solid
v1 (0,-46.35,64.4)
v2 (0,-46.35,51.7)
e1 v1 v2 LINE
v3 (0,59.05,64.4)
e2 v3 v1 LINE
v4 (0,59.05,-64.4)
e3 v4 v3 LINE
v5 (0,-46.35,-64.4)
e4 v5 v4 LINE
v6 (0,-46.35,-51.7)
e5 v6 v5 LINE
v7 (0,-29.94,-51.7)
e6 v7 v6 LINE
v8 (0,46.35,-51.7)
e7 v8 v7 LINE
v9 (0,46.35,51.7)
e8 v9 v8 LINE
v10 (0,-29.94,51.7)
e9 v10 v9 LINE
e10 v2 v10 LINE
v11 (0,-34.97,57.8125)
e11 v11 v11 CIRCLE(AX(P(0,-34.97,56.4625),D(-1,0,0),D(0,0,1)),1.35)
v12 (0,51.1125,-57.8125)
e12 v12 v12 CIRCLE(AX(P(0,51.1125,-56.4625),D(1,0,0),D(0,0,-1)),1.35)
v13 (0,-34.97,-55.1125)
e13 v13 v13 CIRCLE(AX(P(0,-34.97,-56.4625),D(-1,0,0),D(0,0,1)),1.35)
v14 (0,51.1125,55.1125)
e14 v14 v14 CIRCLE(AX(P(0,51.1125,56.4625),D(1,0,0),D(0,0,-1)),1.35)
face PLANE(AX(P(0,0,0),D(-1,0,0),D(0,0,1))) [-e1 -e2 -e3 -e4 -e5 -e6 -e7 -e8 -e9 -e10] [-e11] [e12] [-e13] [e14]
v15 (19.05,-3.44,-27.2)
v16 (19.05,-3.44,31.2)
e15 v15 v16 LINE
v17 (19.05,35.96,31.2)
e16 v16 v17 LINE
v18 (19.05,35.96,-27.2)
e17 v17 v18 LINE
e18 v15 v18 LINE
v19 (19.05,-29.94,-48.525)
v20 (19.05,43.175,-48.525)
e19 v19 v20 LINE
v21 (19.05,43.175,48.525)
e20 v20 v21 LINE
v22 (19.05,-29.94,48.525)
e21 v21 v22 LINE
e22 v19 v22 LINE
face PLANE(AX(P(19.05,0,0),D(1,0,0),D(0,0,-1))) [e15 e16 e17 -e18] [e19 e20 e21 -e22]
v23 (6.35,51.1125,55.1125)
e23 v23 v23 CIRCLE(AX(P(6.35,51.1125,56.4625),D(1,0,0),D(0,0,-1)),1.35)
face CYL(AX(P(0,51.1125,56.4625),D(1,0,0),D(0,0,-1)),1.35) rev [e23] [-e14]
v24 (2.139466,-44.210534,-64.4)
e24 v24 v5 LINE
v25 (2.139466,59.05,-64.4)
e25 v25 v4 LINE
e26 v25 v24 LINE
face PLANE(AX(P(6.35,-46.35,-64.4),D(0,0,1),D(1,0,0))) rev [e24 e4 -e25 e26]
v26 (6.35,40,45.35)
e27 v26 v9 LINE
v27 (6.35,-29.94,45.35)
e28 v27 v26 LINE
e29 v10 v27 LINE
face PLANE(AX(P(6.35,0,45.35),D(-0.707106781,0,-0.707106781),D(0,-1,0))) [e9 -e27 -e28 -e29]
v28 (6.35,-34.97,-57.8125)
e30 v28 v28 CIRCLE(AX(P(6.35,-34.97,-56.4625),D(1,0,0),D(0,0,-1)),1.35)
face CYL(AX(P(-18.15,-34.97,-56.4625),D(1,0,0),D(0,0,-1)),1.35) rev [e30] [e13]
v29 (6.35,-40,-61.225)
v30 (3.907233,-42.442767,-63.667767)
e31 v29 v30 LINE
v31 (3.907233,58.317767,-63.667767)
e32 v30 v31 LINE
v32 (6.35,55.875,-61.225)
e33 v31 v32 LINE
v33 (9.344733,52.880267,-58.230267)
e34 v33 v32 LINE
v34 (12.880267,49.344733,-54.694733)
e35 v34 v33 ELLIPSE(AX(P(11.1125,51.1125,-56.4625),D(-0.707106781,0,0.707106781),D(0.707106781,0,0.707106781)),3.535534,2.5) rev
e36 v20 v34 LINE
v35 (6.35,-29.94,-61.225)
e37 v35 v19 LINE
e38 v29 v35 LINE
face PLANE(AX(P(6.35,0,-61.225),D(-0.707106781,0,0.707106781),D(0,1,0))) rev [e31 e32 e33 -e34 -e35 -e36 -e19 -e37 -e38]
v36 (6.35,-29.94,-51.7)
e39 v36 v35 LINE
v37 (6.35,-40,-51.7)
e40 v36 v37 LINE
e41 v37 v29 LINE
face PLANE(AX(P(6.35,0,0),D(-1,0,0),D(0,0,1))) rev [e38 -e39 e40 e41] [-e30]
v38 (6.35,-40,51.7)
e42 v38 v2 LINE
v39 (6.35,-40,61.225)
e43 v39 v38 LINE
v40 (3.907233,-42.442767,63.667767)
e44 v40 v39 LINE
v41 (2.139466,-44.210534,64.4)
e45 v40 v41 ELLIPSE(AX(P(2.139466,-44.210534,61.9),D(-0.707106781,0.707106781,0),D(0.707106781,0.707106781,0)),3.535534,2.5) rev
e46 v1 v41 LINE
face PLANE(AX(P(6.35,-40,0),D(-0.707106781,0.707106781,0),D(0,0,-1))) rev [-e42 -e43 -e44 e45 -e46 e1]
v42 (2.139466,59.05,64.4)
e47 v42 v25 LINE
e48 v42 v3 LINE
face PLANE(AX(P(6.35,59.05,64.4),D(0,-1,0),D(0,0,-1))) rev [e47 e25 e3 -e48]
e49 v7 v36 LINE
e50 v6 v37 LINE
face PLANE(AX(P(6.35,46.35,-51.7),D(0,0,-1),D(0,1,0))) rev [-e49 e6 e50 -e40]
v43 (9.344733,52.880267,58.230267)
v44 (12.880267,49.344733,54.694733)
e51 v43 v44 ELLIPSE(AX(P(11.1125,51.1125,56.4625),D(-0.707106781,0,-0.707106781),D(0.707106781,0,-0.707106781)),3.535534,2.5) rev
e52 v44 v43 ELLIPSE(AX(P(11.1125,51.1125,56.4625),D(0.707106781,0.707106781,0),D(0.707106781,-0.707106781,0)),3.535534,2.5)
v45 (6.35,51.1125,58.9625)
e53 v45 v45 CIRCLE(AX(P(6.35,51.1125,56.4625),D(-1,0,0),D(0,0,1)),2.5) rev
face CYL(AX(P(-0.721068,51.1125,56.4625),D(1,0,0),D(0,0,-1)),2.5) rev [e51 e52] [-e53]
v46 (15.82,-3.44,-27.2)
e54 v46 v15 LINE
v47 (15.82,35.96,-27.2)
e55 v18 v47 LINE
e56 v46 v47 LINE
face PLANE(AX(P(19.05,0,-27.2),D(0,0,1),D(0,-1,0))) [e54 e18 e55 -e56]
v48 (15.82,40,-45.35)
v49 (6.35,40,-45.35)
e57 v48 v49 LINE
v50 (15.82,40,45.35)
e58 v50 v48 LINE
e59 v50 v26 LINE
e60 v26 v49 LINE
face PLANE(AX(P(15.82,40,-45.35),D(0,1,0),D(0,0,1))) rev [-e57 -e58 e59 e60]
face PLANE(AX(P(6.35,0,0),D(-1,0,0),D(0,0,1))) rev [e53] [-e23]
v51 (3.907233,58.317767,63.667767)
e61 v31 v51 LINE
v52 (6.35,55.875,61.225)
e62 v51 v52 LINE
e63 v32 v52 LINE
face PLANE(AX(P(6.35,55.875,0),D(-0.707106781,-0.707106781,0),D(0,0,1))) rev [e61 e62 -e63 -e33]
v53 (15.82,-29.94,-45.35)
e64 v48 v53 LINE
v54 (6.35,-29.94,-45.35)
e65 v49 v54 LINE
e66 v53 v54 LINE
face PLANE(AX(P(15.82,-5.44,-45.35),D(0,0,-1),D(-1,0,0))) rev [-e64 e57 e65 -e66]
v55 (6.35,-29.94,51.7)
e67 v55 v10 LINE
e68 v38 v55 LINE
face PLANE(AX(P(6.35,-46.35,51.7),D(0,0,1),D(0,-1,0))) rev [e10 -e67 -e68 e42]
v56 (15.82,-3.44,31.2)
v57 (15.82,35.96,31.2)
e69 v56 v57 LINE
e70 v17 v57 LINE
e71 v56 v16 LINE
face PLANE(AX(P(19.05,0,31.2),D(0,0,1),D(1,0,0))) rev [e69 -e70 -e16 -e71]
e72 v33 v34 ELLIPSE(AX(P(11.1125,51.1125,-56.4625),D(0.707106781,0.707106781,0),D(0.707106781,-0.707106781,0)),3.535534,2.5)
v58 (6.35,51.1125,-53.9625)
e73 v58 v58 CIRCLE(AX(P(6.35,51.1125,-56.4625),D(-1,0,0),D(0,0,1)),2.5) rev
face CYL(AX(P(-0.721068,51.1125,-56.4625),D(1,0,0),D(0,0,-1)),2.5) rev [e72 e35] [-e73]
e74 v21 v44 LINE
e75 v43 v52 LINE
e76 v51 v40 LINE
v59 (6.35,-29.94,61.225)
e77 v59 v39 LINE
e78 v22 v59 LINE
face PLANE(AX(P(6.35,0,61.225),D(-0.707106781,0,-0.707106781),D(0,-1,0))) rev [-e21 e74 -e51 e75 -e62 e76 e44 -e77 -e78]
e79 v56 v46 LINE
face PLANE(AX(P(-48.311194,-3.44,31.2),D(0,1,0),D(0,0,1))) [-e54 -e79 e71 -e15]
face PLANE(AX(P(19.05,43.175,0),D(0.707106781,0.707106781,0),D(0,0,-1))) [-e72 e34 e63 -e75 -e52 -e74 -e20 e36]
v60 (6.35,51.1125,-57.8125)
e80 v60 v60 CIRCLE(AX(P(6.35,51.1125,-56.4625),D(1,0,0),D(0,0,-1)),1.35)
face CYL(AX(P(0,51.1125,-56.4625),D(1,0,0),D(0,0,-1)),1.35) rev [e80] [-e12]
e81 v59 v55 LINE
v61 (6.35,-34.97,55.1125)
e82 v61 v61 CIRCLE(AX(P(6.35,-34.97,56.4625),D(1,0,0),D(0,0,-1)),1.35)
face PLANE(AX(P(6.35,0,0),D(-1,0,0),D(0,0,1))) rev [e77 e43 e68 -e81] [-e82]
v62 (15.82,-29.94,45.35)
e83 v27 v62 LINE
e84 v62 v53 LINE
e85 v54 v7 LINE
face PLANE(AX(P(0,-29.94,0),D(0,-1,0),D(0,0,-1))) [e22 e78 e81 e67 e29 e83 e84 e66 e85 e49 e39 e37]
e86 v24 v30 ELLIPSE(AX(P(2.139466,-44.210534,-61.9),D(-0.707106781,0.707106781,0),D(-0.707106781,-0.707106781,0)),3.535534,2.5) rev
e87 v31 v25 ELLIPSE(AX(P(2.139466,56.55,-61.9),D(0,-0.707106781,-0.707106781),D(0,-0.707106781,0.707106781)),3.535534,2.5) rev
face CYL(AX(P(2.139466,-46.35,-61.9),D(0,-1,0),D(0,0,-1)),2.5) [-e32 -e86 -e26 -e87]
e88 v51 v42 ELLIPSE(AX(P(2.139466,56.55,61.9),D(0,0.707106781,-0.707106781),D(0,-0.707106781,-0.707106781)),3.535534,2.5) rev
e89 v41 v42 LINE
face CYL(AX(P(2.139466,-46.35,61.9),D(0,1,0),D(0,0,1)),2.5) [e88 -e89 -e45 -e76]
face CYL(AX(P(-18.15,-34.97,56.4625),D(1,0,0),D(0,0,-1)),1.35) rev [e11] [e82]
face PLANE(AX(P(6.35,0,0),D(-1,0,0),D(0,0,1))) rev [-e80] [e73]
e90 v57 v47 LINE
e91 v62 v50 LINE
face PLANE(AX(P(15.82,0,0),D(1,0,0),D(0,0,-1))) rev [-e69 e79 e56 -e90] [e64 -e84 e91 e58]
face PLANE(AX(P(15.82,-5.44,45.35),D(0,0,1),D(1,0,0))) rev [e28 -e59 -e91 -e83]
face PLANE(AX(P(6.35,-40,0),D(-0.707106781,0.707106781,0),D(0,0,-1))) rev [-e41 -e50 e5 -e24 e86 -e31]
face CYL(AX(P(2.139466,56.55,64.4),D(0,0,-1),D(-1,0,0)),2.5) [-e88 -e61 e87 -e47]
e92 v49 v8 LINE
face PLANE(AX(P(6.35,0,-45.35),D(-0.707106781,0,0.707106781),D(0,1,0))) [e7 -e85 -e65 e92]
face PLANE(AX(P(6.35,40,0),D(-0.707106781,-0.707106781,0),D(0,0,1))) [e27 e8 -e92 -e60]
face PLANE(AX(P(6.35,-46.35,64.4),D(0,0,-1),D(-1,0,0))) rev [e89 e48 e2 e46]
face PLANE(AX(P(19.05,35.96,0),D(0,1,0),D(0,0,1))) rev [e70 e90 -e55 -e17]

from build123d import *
from build123d.topology import SkipClean

# Parameters (mm, degrees)
BOSS_EXTRUDE1_DEPTH = 6.35
CHAMFER1_SIZE       = 3.175
BOSS_EXTRUDE2_DEPTH = 12.7
CHAMFER2_SIZE       = 12.7
CHAMFER3_SIZE       = 6.35
SKETCH3_W           = 90.7
SKETCH3_H           = 45.44
CUT_EXTRUDE1_DEPTH  = 9.47
BOSS_EXTRUDE3_DEPTH = 24.5
CHAMFER4_SIZE       = 6.35
SKETCH5_R           = 1.35
CUT_EXTRUDE2_DEPTH  = 24.5
FILLET1_R           = 2.5
SKETCH6_W           = 58.4
SKETCH6_H           = 26.5
BOSS_EXTRUDE4_DEPTH = 3.23
SKETCH7_R           = 2.5
CUT_EXTRUDE4_DEPTH  = 12.7
SKETCH8_R           = 1.35
CUT_EXTRUDE5_DEPTH  = 89.292426062


with BuildPart() as part:
    # Sketch1 → Boss-Extrude1 (new body)
    with BuildSketch(Plane(origin=(0, 0, 0), x_dir=(0, 0, -1), z_dir=(1, 0, 0))):
        Polygon((-64.4, -46.35), (-64.4, 59.05), (64.4, 59.05), (64.4, -46.35), (51.7, -46.35), (51.7, 46.35), (-51.7, 46.35), (-51.7, -46.35), align=None)
    extrude(amount=BOSS_EXTRUDE1_DEPTH)

    # Chamfer1
    chamfer1_edges = [part.edges().sort_by_distance(p)[0] for p in [
        (6.35, 6.35, -64.4),
        (6.35, 59.05, 0),
        (6.35, 6.35, 64.4),
    ]]
    chamfer(chamfer1_edges, length=CHAMFER1_SIZE)

    # Sketch2 → Boss-Extrude2 (add)
    with BuildSketch(Plane(origin=(6.35, 0, 0), x_dir=(0, 0, -1), z_dir=(1, 0, 0))):
        Polygon((-51.7, -5.44), (-31.2, -5.44), (-31.2, 35.96), (27.2, 35.96), (27.2, -5.44), (51.7, -5.44), (51.7, 46.35), (-51.7, 46.35), align=None)
        Polygon((-61.225, -5.44), (-51.7, -5.44), (-51.7, 46.35), (51.7, 46.35), (51.7, -5.44), (61.225, -5.44), (61.225, 55.875), (-61.225, 55.875), align=None)
    extrude(amount=BOSS_EXTRUDE2_DEPTH)

    # Chamfer2
    chamfer2_edges = [part.edges().sort_by_distance(p)[0] for p in [
        (19.05, 25.2175, -61.225),
        (19.05, 55.875, 0),
        (19.05, 25.2175, 61.225),
    ]]
    chamfer(chamfer2_edges, length=CHAMFER2_SIZE - 0.0001)  # a hair under: the kernel refuses the full size

    # Chamfer3
    chamfer3_edges = [part.edges().sort_by_distance(p)[0] for p in [
        (6.35, 20.455, -51.7),
        (6.35, 46.35, 0),
        (6.35, 20.455, 51.7),
    ]]
    chamfer(chamfer3_edges, length=CHAMFER3_SIZE - 0.0001)  # a hair under: the kernel refuses the full size

    # Sketch3 → Cut-Extrude1 (cut)
    with BuildSketch(Plane.ZY.offset(-6.35)):
        with Locations((0, 17.28)):
            Rectangle(SKETCH3_W, SKETCH3_H)
    extrude(amount=-CUT_EXTRUDE1_DEPTH, mode=Mode.SUBTRACT)

    # Sketch4 → Boss-Extrude3 (add)
    with SkipClean():  # the faces are left unmerged after this step: merging them gives an invalid solid
        with BuildSketch(Plane.XZ.offset(5.44)):
            Polygon((15.82, -27.2), (15.82, -45.35), (6.35, -45.35), (0, -51.7), (6.35, -51.7), (6.35, -61.225), (19.05, -48.525), (19.05, -27.2), align=None)
            Polygon((0, 51.7), (6.35, 45.35), (15.82, 45.35), (15.82, 31.2), (19.05, 31.2), (19.05, 48.525), (6.35, 61.225), (6.35, 51.7), align=None)
        extrude(amount=BOSS_EXTRUDE3_DEPTH)

    # Chamfer4
    chamfer4_edges = [part.edges().sort_by_distance(p)[0] for p in [
        (6.35, -46.35, -56.4625),
        (6.35, -46.35, 56.4625),
    ]]
    chamfer(chamfer4_edges, length=CHAMFER4_SIZE - 0.0001)  # a hair under: the kernel refuses the full size

    # Sketch5 → Cut-Extrude2 (cut)
    with SkipClean():  # the faces are left unmerged after this step: merging them gives an invalid solid
        with BuildSketch(Plane(origin=(6.35, 0, 0), x_dir=(0, 0, -1), z_dir=(1, 0, 0))):
            with Locations((-56.4625, -34.97)):
                Circle(SKETCH5_R)
            with Locations((56.4625, -34.97)):
                Circle(SKETCH5_R)
        extrude(amount=-CUT_EXTRUDE2_DEPTH, mode=Mode.SUBTRACT)

    # Fillet1
    fillet1_edges = [part.edges().sort_by_distance(p)[0] for p in [
        (3.175, 7.93745, 64.4),
        (3.175, 7.93745, -64.4),
        (3.175, 59.05, 0),
    ]]
    fillet(fillet1_edges, radius=FILLET1_R)

    # Sketch6 → Boss-Extrude4 (add)
    with SkipClean():  # the faces are left unmerged after this step: merging them gives an invalid solid
        with BuildSketch(Plane(origin=(19.05, 0, 0), x_dir=(0, 0, -1), z_dir=(1, 0, 0))):
            with Locations((-2, -16.69)):
                Rectangle(SKETCH6_W, SKETCH6_H)
        extrude(amount=-BOSS_EXTRUDE4_DEPTH)

    # Sketch7 → Cut-Extrude4 (cut)
    with SkipClean():  # the faces are left unmerged after this step: merging them gives an invalid solid
        with BuildSketch(Plane(origin=(19.05, 0, 0), x_dir=(0, 0, -1), z_dir=(1, 0, 0))):
            with Locations(Location((-56.4625, 51.1125, 0), (0, 0, 315))):
                Circle(SKETCH7_R)
            with Locations(Location((56.4625, 51.1125, 0), (0, 0, 45))):
                Circle(SKETCH7_R)
        extrude(amount=-CUT_EXTRUDE4_DEPTH, mode=Mode.SUBTRACT)

    # Sketch8 → Cut-Extrude5 (cut, through all)
    with SkipClean():  # the faces are left unmerged after this step: merging them gives an invalid solid
        with BuildSketch(Plane(origin=(6.35, 0, 0), x_dir=(0, 0, -1), z_dir=(1, 0, 0))):
            with Locations((-56.4625, 51.1125)):
                Circle(SKETCH8_R)
            with Locations((56.4625, 51.1125)):
                Circle(SKETCH8_R)
        extrude(amount=-CUT_EXTRUDE5_DEPTH, mode=Mode.SUBTRACT)


solid = part.part
